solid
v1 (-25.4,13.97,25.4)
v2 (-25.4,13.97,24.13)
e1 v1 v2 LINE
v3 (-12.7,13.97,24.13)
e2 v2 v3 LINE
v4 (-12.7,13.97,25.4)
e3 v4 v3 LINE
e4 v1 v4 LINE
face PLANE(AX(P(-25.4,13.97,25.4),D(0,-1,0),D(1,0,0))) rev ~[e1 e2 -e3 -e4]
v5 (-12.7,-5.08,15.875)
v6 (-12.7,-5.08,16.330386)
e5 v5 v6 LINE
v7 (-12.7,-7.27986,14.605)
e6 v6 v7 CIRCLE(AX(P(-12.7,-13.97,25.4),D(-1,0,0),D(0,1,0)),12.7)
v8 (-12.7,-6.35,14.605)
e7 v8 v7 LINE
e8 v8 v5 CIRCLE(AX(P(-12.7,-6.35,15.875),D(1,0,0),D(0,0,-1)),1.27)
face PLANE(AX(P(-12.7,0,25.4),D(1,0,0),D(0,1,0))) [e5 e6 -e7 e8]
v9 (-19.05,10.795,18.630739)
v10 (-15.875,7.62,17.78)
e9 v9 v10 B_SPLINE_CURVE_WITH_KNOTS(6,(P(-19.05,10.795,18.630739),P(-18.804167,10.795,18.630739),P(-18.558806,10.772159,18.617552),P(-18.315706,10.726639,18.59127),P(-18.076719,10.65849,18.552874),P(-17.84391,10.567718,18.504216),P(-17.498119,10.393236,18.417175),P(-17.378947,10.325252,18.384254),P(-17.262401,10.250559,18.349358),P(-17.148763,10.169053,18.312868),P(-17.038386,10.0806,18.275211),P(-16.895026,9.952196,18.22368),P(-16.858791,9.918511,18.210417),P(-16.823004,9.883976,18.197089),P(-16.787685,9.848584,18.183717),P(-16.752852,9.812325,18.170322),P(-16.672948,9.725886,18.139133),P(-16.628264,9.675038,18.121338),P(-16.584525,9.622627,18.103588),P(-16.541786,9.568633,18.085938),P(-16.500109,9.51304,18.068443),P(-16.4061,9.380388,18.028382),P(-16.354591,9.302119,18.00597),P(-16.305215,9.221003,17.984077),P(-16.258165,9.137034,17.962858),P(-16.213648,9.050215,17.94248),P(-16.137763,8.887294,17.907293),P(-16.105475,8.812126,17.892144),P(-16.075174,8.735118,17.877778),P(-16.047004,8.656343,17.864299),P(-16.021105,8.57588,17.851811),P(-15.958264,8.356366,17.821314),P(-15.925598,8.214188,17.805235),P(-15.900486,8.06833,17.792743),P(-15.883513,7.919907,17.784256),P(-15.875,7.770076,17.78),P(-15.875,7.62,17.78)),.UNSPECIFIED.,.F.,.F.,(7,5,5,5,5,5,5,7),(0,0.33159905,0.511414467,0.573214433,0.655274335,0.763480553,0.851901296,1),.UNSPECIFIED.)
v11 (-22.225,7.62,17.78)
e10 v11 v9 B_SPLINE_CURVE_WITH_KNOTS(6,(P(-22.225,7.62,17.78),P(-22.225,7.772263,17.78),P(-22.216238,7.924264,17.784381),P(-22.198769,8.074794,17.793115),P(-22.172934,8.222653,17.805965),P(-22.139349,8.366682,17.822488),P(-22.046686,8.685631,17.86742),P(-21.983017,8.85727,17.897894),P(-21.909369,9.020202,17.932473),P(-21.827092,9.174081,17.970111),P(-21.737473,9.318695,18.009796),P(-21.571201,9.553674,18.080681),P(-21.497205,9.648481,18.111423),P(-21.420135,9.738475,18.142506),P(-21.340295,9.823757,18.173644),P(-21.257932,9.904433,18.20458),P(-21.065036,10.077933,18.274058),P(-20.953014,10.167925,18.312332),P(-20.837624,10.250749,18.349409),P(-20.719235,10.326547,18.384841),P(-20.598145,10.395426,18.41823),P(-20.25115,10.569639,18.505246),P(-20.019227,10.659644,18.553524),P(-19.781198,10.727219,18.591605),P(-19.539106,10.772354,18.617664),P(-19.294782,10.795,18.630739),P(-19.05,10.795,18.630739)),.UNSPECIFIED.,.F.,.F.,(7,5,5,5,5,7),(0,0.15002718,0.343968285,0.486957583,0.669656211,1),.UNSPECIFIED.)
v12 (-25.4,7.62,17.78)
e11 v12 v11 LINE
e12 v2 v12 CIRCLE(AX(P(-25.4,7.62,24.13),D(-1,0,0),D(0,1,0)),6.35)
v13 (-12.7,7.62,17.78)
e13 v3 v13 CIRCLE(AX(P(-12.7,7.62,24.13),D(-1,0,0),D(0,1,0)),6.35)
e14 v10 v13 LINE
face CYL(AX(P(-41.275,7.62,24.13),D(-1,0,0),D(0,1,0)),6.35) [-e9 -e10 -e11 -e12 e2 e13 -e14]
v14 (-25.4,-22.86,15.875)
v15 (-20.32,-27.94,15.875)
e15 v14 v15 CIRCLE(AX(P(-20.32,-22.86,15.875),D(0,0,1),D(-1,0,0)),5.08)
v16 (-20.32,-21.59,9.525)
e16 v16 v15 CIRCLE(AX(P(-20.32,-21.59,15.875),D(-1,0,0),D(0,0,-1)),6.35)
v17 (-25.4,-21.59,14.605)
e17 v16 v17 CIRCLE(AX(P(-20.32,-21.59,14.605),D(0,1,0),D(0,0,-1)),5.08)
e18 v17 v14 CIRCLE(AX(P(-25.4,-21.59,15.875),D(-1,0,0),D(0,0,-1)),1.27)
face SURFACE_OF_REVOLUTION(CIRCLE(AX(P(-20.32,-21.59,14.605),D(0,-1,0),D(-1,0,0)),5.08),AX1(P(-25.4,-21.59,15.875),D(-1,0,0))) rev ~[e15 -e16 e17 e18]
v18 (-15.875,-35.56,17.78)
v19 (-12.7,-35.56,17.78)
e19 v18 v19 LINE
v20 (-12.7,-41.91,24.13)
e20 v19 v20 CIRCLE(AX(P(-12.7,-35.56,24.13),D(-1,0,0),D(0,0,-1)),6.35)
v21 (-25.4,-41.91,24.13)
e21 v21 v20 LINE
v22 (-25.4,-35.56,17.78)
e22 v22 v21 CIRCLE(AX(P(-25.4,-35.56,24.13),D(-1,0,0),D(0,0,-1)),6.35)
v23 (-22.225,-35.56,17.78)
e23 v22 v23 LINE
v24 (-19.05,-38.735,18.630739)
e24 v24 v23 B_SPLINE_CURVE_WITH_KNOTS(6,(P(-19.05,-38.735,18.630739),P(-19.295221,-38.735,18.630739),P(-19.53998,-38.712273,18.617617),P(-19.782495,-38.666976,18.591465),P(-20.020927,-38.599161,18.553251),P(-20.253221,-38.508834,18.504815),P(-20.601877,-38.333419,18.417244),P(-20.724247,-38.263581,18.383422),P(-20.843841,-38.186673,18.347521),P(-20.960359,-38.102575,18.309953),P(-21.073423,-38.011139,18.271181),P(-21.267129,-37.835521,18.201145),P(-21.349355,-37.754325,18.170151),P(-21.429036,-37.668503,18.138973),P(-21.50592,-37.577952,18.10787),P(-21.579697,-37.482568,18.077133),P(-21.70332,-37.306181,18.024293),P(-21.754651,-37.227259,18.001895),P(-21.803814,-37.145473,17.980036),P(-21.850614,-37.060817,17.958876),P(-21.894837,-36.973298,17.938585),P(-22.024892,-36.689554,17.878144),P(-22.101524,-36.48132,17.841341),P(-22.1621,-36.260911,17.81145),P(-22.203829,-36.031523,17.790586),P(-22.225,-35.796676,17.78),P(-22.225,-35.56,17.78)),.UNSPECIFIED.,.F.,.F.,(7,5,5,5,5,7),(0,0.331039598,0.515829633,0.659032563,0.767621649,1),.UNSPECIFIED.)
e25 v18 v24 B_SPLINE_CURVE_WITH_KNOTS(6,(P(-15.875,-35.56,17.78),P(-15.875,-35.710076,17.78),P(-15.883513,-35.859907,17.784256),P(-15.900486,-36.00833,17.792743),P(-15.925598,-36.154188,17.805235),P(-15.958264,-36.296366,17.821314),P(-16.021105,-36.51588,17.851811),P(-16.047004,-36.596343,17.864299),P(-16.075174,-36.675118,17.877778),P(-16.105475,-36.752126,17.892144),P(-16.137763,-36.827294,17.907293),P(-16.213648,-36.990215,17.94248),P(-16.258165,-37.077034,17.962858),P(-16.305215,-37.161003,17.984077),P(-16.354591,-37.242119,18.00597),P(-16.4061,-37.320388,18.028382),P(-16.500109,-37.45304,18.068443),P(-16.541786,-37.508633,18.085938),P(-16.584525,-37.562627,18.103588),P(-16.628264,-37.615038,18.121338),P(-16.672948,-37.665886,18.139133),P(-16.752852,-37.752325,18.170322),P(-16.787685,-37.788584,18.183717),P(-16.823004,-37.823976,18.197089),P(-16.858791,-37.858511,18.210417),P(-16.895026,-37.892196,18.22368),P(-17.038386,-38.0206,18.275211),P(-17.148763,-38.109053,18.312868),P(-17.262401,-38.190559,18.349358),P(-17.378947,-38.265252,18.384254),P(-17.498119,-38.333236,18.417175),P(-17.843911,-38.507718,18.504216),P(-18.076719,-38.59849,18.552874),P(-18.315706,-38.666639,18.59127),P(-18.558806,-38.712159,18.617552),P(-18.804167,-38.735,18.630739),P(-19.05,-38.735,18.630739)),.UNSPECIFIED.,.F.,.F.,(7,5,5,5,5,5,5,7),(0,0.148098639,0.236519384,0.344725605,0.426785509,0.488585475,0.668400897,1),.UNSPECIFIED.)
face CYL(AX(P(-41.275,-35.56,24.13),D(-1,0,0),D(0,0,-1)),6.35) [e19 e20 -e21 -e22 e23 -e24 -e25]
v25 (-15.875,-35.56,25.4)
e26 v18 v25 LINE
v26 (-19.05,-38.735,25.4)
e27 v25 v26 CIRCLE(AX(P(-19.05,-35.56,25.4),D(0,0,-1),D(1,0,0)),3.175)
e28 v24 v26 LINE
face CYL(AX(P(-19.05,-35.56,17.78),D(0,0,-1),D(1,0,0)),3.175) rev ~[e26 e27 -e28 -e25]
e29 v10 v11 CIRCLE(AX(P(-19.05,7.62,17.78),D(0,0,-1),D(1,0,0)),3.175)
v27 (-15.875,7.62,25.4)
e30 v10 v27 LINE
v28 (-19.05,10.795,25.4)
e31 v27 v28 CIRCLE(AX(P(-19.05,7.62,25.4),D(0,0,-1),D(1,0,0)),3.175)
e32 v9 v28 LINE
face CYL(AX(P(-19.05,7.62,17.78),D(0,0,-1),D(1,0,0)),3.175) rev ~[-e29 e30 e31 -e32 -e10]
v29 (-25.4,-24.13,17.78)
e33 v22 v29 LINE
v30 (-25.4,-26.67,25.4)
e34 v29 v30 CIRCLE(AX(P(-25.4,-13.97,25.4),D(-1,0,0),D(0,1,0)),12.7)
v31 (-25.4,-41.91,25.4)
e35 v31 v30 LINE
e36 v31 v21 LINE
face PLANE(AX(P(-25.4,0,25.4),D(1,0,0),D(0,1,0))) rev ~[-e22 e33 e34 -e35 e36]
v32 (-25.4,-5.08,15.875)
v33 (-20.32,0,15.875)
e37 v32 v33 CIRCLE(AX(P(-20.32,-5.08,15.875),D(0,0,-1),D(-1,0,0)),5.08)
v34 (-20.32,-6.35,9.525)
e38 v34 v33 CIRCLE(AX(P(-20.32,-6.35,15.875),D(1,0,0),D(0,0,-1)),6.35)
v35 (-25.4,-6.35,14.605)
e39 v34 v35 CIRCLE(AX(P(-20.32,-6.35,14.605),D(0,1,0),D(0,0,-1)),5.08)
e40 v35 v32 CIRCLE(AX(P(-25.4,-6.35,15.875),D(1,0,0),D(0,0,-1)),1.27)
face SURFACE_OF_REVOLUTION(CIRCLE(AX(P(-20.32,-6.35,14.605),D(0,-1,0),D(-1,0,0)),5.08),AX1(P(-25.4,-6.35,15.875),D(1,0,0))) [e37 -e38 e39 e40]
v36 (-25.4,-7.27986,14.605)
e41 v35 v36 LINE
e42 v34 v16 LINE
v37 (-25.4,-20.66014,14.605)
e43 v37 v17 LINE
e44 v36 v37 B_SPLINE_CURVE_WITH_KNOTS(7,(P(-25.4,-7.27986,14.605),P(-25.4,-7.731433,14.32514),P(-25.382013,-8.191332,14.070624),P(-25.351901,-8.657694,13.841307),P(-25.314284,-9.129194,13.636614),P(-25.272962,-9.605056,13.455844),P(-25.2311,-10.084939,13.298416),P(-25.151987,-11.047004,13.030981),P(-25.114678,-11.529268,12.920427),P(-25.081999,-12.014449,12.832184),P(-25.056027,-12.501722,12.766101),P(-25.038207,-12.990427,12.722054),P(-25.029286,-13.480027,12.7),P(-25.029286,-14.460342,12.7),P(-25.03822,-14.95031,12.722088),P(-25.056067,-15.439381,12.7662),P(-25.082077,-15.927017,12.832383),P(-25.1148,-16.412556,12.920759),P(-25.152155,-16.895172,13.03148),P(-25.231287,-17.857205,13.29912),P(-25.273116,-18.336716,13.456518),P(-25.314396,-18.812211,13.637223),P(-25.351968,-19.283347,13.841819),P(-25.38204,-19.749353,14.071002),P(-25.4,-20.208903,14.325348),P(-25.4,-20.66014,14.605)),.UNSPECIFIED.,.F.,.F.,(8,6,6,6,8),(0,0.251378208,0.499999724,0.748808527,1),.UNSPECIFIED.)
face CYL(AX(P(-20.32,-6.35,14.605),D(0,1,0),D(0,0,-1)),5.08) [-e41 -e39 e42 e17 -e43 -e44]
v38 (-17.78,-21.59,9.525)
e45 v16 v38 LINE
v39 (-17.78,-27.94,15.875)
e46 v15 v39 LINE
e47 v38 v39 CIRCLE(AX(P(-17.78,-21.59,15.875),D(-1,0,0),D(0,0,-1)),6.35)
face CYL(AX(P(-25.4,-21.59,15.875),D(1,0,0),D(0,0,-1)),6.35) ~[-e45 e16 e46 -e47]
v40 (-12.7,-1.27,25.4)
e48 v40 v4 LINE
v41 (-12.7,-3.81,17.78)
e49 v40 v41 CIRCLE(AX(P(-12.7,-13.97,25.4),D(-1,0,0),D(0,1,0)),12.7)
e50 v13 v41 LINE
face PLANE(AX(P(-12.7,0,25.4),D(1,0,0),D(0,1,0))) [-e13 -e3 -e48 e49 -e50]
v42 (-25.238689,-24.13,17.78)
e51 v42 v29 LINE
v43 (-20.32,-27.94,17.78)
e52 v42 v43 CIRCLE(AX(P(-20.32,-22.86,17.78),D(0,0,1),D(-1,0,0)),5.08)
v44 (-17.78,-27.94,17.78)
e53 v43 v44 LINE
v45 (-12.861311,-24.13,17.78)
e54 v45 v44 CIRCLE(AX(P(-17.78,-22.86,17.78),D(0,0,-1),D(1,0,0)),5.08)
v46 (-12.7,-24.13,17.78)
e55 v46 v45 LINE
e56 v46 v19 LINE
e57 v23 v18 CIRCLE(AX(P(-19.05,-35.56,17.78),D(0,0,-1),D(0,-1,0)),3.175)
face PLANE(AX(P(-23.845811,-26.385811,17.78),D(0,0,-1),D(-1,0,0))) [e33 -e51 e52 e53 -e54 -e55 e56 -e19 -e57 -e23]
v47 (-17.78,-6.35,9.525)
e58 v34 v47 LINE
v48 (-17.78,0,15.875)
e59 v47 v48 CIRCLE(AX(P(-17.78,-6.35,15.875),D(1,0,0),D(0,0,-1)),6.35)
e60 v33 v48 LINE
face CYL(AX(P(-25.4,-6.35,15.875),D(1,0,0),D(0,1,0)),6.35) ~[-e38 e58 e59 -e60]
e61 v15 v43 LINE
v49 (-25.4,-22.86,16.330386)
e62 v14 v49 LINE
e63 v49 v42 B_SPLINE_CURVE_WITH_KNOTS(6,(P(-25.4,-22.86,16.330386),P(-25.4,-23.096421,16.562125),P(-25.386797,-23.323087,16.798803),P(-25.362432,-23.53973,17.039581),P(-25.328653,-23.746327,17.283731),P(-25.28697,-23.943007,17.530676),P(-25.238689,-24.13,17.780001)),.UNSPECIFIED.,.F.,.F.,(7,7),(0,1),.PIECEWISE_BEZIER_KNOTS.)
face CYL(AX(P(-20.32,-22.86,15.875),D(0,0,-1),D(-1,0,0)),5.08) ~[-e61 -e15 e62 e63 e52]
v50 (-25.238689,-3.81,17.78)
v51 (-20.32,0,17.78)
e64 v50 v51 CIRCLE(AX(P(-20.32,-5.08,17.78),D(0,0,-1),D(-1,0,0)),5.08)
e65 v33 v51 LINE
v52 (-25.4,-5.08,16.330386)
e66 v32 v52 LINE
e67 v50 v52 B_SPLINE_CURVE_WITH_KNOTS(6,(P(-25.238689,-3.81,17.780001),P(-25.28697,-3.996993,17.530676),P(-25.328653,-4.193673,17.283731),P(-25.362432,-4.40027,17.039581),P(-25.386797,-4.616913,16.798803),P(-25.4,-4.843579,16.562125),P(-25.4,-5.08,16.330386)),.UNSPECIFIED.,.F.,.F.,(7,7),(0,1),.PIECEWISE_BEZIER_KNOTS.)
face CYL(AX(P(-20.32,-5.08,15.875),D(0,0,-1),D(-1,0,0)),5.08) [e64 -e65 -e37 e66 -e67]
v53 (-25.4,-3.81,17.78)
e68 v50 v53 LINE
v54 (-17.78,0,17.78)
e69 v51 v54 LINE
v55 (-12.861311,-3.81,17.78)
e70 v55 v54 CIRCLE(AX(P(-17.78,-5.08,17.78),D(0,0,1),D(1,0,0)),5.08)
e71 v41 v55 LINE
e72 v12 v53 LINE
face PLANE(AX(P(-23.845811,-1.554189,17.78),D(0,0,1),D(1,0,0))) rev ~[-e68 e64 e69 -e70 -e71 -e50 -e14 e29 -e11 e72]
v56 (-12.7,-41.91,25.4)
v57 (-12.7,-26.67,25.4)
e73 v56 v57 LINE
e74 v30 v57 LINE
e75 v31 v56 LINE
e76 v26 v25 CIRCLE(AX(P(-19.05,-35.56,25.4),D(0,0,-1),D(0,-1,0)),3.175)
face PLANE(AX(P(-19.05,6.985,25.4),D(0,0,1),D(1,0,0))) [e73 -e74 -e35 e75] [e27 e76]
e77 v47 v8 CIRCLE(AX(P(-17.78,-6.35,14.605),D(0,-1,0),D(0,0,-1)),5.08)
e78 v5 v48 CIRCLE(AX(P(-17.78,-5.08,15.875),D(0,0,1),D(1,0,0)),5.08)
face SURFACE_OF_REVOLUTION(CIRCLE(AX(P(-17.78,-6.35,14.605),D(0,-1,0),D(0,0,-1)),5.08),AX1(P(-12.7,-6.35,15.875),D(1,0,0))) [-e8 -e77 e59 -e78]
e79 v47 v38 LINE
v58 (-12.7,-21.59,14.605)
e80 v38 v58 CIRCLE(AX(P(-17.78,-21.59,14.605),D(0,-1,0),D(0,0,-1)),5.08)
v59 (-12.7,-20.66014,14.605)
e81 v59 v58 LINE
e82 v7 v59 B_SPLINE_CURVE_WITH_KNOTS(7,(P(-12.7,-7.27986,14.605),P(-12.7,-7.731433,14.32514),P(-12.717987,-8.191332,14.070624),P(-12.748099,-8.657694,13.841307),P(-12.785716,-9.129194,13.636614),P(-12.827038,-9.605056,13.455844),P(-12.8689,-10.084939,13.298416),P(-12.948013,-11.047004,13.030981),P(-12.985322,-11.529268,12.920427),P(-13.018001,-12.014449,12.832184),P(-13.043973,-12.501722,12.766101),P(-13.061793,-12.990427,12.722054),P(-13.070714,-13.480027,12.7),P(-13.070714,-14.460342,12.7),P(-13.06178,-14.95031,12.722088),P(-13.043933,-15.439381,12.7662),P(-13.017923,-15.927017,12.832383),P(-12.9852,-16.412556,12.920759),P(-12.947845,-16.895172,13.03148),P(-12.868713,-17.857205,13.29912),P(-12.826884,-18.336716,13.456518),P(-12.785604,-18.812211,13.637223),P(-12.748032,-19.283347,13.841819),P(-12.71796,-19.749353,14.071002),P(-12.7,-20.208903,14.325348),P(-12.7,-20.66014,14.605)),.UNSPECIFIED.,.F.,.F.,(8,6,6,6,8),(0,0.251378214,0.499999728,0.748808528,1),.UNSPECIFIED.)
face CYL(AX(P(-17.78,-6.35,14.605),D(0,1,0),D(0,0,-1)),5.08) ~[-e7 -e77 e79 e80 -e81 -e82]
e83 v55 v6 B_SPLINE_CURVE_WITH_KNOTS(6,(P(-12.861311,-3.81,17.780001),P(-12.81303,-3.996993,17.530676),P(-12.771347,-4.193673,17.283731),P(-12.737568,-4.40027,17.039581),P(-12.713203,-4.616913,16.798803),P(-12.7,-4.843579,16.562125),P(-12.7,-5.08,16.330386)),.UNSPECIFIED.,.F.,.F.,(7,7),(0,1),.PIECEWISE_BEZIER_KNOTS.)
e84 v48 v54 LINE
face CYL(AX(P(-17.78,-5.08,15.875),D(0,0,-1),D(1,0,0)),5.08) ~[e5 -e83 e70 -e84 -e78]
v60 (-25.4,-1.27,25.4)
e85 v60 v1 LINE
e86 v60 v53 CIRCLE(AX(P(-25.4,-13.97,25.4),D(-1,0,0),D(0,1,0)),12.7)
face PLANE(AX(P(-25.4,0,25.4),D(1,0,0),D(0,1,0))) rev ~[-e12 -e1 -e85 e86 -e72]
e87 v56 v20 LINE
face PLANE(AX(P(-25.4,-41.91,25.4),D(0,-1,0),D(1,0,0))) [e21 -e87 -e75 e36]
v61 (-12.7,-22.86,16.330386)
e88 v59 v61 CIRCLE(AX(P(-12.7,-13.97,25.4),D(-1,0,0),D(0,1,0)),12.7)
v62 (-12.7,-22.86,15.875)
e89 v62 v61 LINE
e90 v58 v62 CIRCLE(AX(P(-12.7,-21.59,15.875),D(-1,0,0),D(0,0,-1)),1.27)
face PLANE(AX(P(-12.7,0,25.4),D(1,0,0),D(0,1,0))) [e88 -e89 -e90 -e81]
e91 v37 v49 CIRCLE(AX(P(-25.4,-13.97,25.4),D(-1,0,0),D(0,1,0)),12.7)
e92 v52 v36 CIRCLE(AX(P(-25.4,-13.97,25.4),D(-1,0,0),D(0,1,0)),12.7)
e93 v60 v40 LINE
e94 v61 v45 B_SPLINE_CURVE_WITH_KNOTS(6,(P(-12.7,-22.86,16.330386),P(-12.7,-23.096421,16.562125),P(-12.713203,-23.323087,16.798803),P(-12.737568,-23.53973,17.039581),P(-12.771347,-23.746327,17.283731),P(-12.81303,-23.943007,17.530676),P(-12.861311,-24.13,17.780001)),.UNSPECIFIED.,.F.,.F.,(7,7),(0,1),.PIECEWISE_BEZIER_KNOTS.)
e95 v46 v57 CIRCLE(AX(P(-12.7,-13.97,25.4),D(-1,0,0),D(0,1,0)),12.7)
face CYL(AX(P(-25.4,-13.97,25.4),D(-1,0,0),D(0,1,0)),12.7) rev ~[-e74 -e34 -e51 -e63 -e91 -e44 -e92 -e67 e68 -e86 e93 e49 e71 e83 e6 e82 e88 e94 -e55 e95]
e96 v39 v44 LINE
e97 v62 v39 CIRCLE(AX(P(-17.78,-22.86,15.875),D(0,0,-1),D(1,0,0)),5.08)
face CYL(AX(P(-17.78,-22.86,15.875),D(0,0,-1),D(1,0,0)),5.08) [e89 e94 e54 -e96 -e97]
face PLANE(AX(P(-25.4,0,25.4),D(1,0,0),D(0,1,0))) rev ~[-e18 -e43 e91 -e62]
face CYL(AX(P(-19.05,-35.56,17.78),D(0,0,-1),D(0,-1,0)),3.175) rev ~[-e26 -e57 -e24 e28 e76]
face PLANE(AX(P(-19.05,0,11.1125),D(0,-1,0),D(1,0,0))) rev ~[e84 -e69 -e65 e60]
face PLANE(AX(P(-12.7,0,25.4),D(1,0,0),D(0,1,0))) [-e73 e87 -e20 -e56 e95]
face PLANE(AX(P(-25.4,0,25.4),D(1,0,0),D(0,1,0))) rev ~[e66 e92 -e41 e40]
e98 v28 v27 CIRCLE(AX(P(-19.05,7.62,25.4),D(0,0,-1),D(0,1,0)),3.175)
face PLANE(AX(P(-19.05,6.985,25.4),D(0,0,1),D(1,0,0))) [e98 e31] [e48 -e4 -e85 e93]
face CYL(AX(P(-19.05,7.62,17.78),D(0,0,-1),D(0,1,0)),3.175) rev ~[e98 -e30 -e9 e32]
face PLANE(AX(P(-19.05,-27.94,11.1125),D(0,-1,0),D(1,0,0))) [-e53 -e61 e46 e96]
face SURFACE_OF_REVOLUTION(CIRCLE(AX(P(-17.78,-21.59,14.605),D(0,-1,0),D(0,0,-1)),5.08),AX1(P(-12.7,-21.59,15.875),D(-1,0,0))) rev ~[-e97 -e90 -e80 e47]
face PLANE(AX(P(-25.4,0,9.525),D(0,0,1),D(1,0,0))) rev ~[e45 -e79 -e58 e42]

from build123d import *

# Parameters (mm, degrees)
F0_W          = 12.7
F0_H          = 3.175
F0_H_2        = 12.7
F1_DEPTH      = 27.94
F2_W          = 12.7
F2_H          = 10.9347
F2_H_2        = 3.0353
F3_DEPTH      = 7.62
F4_W          = 12.7
F4_H          = 13.97
F5_DEPTH      = 7.62
F7_DEPTH      = 25.4
F10_DEPTH     = 25.4
F11_T1_DEPTH  = 44.45
F12_R         = 6.35
F13_R         = 6.35
F14_T1_DEPTH  = 15.24
F14_T3_DEPTH  = 1.905
F14_T6_ANGLE  = 90
F14_T8_ANGLE  = 90
F14_T10_ANGLE = 90
F14_T12_ANGLE = 90


# Not quite as in the source:
# - a fillet or chamfer that OpenCascade refuses, or shapes differently, is made with other operations: its cross-section is extruded or revolved along the edge and cut away or added


with BuildPart() as f1:
    # F0 (on Front) → F1 (new body)
    with BuildSketch(Plane.XZ):
        with Locations((-19.05, 11.1125)):
            Rectangle(F0_W, F0_H)
        with Locations((-19.05, 19.05)):
            Rectangle(F0_W, F0_H_2)
    extrude(amount=F1_DEPTH)

    # F2 (on face) → F3 (join)
    with BuildSketch(Plane.XY.offset(25.4)):
        with Locations((-19.05, -33.40735)):
            Rectangle(F2_W, F2_H)
        with Locations((-19.05, -40.39235)):
            Rectangle(F2_W, F2_H_2)
    extrude(amount=-F3_DEPTH)

    # F4 (on face) → F5 (join)
    with BuildSketch(Plane.XY.offset(25.4)):
        with Locations((-19.05, 6.985)):
            Rectangle(F4_W, F4_H)
    extrude(amount=-F5_DEPTH)

    # F6 (on face) → F7 (cut)
    with BuildSketch(Plane(origin=(-25.4, 0, 0), x_dir=(0, -1, 0), z_dir=(-1, 0, 0))):
        with BuildLine():
            ThreePointArc((1.27, 25.4), (13.97, 12.7), (26.67, 25.4))
            Line((26.67, 25.4), (1.27, 25.4))
        make_face()
    extrude(amount=-F7_DEPTH, mode=Mode.SUBTRACT)

    # F8 (on face) + F9 (on face) → F10 (cut)
    with BuildSketch(Plane(origin=(0, 0, 17.78), x_dir=(1, 0, 0), z_dir=(0, 0, -1))):
        with BuildLine():
            ThreePointArc((-19.05, 38.735), (-21.2950640303, 33.3149359697), (-15.875, 35.56))
            ThreePointArc((-15.875, 35.56), (-16.8049359697, 37.8050640303), (-19.05, 38.735))
        make_face()
    with BuildSketch(Plane(origin=(0, 0, 17.78), x_dir=(1, 0, 0), z_dir=(0, 0, -1))):
        with BuildLine():
            ThreePointArc((-19.05, -10.795), (-16.8049359697, -9.8650640303), (-15.875, -7.62))
            ThreePointArc((-15.875, -7.62), (-21.2950640303, -5.3749359697), (-19.05, -10.795))
        make_face()
    extrude(amount=-F10_DEPTH, mode=Mode.SUBTRACT)

    # F11: fillet of radius 6.35 on 2 edges, made by hand

    # F11_s2 → F11_t1 (cut)
    with BuildSketch(Plane.YZ.offset(-41.275)):
        with BuildLine():
            ThreePointArc((-35.56, 17.78), (-40.0501280605, 19.6398719395), (-41.91, 24.13))
            Line((-41.91, 24.13), (-41.91, 17.78))
            Line((-41.91, 17.78), (-35.56, 17.78))
        make_face()
        with BuildLine():
            ThreePointArc((13.97, 24.13), (12.1101280605, 19.6398719395), (7.62, 17.78))
            Line((7.62, 17.78), (13.97, 17.78))
            Line((13.97, 17.78), (13.97, 24.13))
        make_face()
    extrude(amount=F11_T1_DEPTH, mode=Mode.SUBTRACT)

    # F12
    f12_edges = [f1.edges().sort_by_distance(p)[0] for p in [
        (-19.05, 0, 9.525),
    ]]
    fillet(f12_edges, radius=F12_R)

    # F13
    f13_edges = [f1.edges().sort_by_distance(p)[0] for p in [
        (-19.05, -27.94, 9.525),
    ]]
    fillet(f13_edges, radius=F13_R)

    # F14: fillet of radius 5.08 on 2 edges, made by hand

    # F14_s2 → F14_t1 (cut)
    with BuildSketch(Plane.XZ.offset(6.35)):
        with BuildLine():
            ThreePointArc((-17.78, 9.525), (-14.1878975516, 11.0128975516), (-12.7, 14.605))
            Line((-12.7, 14.605), (-12.7, 9.525))
            Line((-12.7, 9.525), (-17.78, 9.525))
        make_face()
        with BuildLine():
            ThreePointArc((-20.32, 9.525), (-23.9121024484, 11.0128975516), (-25.4, 14.605))
            Line((-25.4, 14.605), (-25.4, 9.525))
            Line((-25.4, 9.525), (-20.32, 9.525))
        make_face()
    extrude(amount=F14_T1_DEPTH, mode=Mode.SUBTRACT)

    # F14_s4 → F14_t3 (cut)
    with BuildSketch(Plane.XY.offset(15.875)):
        with BuildLine():
            ThreePointArc((-25.4, -22.86), (-23.9121024484, -26.4521024484), (-20.32, -27.94))
            Line((-20.32, -27.94), (-25.4, -27.94))
            Line((-25.4, -27.94), (-25.4, -22.86))
        make_face()
        with BuildLine():
            ThreePointArc((-25.4, -5.08), (-23.9121024484, -1.4878975516), (-20.32, 0))
            Line((-20.32, 0), (-25.4, 0))
            Line((-25.4, 0), (-25.4, -5.08))
        make_face()
        with BuildLine():
            ThreePointArc((-12.7, -22.86), (-14.1878975516, -26.4521024484), (-17.78, -27.94))
            Line((-17.78, -27.94), (-12.7, -27.94))
            Line((-12.7, -27.94), (-12.7, -22.86))
        make_face()
        with BuildLine():
            ThreePointArc((-12.7, -5.08), (-14.1878975516, -1.4878975516), (-17.78, 0))
            Line((-17.78, 0), (-12.7, 0))
            Line((-12.7, 0), (-12.7, -5.08))
        make_face()
    extrude(amount=F14_T3_DEPTH, mode=Mode.SUBTRACT)

    # F14_s5 → F14_t6 (revolve, cut)
    with BuildSketch(Plane.XZ.offset(6.35)):
        with BuildLine():
            ThreePointArc((-25.4, 14.605), (-23.9121024484, 11.0128975516), (-20.32, 9.525))
            Line((-20.32, 9.525), (-25.4, 9.525))
            Line((-25.4, 9.525), (-25.4, 14.605))
        make_face()
    revolve(axis=Axis((-25.4, -6.35, 15.875), (1, 0, 0)), revolution_arc=F14_T6_ANGLE, mode=Mode.SUBTRACT)

    # F14_s7 → F14_t8 (revolve, cut)
    with BuildSketch(Plane.XZ.offset(21.59)):
        with BuildLine():
            ThreePointArc((-25.4, 14.605), (-23.9121024484, 11.0128975516), (-20.32, 9.525))
            Line((-20.32, 9.525), (-25.4, 9.525))
            Line((-25.4, 9.525), (-25.4, 14.605))
        make_face()
    revolve(axis=Axis((-25.4, -21.59, 15.875), (-1, 0, 0)), revolution_arc=F14_T8_ANGLE, mode=Mode.SUBTRACT)

    # F14_s9 → F14_t10 (revolve, cut)
    with BuildSketch(Plane.XZ.offset(6.35)):
        with BuildLine():
            ThreePointArc((-17.78, 9.525), (-14.1878975516, 11.0128975516), (-12.7, 14.605))
            Line((-12.7, 14.605), (-12.7, 9.525))
            Line((-12.7, 9.525), (-17.78, 9.525))
        make_face()
    revolve(axis=Axis((-12.7, -6.35, 15.875), (1, 0, 0)), revolution_arc=F14_T10_ANGLE, mode=Mode.SUBTRACT)

    # F14_s11 → F14_t12 (revolve, cut)
    with BuildSketch(Plane.XZ.offset(21.59)):
        with BuildLine():
            ThreePointArc((-17.78, 9.525), (-14.1878975516, 11.0128975516), (-12.7, 14.605))
            Line((-12.7, 14.605), (-12.7, 9.525))
            Line((-12.7, 9.525), (-17.78, 9.525))
        make_face()
    revolve(axis=Axis((-12.7, -21.59, 15.875), (-1, 0, 0)), revolution_arc=F14_T12_ANGLE, mode=Mode.SUBTRACT)


solid = f1.part
